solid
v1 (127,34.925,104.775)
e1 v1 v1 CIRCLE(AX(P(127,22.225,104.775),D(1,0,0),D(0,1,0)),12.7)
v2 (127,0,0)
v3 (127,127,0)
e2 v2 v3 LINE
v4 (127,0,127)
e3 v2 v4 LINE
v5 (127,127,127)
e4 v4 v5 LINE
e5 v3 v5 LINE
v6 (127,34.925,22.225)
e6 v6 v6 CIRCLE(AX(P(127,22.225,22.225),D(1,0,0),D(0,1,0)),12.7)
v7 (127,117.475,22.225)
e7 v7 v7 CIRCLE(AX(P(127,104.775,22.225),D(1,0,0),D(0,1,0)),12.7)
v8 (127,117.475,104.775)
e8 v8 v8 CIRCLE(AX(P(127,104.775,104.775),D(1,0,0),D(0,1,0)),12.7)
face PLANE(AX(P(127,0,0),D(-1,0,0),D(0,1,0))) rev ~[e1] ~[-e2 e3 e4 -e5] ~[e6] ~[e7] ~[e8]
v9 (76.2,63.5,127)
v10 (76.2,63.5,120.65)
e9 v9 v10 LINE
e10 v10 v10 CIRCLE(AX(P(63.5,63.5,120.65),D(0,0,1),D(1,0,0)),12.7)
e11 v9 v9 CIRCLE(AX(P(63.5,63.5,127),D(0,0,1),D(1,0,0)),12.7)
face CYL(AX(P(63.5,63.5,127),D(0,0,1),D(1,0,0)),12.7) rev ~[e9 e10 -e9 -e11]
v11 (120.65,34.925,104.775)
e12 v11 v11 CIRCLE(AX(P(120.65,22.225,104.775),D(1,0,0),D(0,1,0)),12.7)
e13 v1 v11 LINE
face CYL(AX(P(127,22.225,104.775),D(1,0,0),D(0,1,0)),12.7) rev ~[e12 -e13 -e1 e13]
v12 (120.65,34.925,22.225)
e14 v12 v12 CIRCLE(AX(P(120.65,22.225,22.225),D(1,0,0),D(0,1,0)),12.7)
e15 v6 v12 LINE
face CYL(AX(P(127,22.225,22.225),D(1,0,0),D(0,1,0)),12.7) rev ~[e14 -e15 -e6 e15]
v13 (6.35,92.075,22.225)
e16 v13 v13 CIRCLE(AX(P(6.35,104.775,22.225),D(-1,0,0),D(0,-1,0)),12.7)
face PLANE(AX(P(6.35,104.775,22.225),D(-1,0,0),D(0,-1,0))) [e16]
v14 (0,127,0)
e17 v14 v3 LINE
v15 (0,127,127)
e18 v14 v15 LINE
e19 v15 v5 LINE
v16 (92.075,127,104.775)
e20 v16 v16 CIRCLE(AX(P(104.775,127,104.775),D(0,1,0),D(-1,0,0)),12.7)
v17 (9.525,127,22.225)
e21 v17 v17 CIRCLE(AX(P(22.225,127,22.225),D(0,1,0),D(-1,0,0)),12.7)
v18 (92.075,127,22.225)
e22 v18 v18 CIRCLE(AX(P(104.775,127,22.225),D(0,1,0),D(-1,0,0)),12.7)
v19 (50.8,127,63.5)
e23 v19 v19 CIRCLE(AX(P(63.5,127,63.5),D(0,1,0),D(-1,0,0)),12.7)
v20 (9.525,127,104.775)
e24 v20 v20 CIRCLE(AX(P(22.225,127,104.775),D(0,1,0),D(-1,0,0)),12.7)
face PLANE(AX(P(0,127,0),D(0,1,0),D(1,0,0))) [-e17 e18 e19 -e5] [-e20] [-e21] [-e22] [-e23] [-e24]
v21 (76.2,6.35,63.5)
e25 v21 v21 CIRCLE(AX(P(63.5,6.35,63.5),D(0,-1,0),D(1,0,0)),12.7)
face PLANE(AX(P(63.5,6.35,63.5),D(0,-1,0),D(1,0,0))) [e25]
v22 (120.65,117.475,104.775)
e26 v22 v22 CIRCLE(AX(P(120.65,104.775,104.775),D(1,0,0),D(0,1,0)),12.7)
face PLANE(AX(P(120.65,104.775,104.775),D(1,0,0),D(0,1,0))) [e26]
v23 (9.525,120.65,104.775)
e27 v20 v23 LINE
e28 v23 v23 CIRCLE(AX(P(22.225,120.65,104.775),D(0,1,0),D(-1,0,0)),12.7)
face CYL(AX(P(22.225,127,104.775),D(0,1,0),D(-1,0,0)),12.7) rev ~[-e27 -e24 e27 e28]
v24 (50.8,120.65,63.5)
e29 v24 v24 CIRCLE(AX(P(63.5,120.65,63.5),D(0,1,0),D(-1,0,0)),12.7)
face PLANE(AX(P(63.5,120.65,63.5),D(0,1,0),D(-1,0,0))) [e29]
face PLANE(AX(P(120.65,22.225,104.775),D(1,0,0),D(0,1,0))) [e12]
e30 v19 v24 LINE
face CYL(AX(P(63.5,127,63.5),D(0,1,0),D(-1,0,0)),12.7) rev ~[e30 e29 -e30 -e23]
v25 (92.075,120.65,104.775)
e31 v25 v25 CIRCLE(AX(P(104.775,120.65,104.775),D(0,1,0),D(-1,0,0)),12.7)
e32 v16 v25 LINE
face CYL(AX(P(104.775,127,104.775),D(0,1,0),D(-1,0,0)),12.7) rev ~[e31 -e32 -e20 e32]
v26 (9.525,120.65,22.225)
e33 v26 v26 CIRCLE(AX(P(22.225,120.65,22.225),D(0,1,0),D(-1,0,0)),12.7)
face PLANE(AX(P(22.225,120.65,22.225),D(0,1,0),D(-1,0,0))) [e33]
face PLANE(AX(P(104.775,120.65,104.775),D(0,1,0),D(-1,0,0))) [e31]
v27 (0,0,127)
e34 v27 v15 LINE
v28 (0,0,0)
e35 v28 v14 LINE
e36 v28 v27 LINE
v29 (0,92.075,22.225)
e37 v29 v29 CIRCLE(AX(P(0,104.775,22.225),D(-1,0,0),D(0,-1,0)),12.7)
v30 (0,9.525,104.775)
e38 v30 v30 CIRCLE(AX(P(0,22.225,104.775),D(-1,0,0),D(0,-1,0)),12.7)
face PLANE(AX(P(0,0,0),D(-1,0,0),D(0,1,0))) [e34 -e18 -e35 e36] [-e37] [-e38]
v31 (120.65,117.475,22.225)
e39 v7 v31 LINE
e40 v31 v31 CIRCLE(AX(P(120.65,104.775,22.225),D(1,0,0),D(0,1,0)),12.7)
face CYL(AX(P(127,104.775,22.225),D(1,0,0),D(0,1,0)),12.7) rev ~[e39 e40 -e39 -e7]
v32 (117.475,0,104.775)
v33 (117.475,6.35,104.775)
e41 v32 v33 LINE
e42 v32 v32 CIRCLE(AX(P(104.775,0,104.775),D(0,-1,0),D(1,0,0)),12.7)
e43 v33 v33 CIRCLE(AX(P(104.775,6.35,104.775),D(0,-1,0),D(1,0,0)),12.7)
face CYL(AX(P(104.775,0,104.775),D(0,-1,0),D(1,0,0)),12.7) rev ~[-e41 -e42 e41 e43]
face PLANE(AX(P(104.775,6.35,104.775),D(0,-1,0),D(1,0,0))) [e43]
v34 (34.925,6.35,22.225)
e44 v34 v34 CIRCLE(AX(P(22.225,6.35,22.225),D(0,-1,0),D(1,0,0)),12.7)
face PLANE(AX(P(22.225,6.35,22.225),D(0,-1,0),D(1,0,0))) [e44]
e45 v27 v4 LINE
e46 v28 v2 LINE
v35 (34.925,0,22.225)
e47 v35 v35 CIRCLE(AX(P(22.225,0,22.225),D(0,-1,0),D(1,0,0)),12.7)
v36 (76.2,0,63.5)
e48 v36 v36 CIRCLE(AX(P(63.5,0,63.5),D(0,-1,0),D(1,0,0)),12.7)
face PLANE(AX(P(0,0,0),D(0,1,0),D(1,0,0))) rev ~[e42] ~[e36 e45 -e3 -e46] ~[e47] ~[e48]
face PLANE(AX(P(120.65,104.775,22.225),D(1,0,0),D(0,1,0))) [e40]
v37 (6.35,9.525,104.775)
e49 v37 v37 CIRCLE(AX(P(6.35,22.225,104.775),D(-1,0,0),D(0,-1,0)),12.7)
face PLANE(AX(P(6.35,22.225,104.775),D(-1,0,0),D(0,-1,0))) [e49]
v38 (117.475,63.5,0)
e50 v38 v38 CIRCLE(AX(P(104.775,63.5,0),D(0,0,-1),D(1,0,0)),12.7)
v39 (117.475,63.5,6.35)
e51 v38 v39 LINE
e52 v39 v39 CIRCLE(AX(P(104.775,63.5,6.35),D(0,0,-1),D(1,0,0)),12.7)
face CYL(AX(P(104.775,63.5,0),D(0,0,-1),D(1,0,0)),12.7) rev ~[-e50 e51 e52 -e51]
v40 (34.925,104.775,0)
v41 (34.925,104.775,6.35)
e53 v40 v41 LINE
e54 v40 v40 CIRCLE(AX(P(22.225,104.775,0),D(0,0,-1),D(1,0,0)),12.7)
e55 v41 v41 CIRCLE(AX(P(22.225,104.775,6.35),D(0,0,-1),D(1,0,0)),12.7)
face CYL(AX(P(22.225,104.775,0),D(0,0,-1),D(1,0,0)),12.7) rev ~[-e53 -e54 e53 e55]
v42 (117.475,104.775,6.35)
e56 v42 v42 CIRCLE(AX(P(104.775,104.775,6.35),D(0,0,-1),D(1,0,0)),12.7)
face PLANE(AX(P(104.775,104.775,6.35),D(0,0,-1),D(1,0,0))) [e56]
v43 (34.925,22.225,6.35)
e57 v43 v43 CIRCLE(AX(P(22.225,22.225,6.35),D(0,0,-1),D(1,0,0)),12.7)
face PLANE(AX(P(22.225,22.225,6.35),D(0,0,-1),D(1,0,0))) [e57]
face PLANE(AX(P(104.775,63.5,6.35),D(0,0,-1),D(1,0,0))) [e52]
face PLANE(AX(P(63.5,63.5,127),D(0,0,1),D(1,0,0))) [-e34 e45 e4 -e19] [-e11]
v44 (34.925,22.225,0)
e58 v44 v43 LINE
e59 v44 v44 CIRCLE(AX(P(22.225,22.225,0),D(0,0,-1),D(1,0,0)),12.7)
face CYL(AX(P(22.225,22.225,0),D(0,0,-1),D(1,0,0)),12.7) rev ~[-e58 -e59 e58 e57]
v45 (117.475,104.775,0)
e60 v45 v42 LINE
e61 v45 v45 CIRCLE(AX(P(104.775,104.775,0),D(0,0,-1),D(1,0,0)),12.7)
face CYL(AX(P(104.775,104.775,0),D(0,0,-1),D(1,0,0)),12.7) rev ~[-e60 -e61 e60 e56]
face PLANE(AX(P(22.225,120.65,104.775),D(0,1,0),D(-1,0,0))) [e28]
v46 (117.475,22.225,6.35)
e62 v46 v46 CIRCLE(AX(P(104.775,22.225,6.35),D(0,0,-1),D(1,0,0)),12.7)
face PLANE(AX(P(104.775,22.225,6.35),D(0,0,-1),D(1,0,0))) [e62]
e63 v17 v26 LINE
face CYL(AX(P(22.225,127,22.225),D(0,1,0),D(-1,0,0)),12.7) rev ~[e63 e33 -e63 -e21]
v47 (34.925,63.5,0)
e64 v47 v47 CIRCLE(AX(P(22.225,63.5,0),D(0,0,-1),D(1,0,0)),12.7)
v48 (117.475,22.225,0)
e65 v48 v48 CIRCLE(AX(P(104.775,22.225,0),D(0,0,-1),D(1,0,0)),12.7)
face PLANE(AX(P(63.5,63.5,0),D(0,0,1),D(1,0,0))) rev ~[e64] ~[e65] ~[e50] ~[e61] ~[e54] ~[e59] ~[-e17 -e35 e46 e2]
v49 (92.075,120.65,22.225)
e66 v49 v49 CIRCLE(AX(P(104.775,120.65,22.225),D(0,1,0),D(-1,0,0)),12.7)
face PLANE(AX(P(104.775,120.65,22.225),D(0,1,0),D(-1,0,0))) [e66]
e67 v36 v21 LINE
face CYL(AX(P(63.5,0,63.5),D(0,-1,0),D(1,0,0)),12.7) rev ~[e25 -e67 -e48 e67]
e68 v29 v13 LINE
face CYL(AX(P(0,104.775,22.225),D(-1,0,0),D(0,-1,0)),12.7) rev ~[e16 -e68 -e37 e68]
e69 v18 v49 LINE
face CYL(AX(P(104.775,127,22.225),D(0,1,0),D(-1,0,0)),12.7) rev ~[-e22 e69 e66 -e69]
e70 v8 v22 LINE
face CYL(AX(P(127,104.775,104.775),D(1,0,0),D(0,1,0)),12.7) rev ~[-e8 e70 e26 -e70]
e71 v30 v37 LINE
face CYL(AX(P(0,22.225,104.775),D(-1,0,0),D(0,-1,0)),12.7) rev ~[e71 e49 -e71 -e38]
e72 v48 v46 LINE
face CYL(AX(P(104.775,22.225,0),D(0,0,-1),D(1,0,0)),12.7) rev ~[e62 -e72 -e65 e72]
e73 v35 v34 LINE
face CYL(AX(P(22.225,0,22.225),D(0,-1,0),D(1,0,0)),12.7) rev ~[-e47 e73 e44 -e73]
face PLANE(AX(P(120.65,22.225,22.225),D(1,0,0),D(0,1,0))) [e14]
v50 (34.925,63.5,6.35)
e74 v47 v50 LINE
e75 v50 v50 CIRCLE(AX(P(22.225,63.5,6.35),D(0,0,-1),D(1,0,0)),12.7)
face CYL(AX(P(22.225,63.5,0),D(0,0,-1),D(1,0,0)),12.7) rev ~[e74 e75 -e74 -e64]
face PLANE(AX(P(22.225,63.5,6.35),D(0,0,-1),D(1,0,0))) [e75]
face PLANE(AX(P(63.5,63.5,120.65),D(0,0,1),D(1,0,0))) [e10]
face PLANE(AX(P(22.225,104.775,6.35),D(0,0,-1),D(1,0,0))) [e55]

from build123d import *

# Parameters (mm, degrees)
F0_W      = 127
F0_H      = 127
F1_DEPTH  = 127
F2_R      = 12.7
F3_DEPTH  = 6.35
F4_R      = 12.7
F5_DEPTH  = 6.35
F6_R      = 12.7
F7_DEPTH  = 6.35
F8_R      = 12.7
F9_DEPTH  = 6.35
F10_R     = 12.7
F11_DEPTH = 6.35
F12_R     = 12.7
F13_DEPTH = 6.35


# Not quite as in the source:
# - a feature names something its author has since deleted; it is built from what else it names


with BuildPart() as f1:
    # F0 (on Top) → F1 (new body)
    with BuildSketch(Plane.XY):
        with Locations((63.5, 63.5)):
            Rectangle(F0_W, F0_H)
    extrude(amount=F1_DEPTH)

    # F2 (on face) → F3 (cut)
    with BuildSketch(Plane.XY.offset(127)):
        with Locations((63.5, 63.5)):
            Circle(F2_R)
    extrude(amount=-F3_DEPTH, mode=Mode.SUBTRACT)

    # F4 (on face) → F5 (cut)
    with BuildSketch(Plane(origin=(0, 0, 0), x_dir=(0, -1, 0), z_dir=(-1, 0, 0))):
        with Locations((-104.775, 22.225)):
            Circle(F4_R)
        with Locations((-22.225, 104.775)):
            Circle(F4_R)
    extrude(amount=-F5_DEPTH, mode=Mode.SUBTRACT)

    # F6 (on face) → F7 (cut)
    with BuildSketch(Plane.XZ):
        with Locations((22.225, 22.225)):
            Circle(F6_R)
        with Locations((63.5, 63.5)):
            Circle(F6_R)
        with Locations((104.775, 104.775)):
            Circle(F6_R)
    extrude(amount=-F7_DEPTH, mode=Mode.SUBTRACT)

    # F8 (on face) → F9 (cut)
    with BuildSketch(Plane.YZ.offset(127)):
        with Locations((22.225, 22.225)):
            Circle(F8_R)
        with Locations((22.225, 104.775)):
            Circle(F8_R)
        with Locations((104.775, 104.775)):
            Circle(F8_R)
        with Locations((104.775, 22.225)):
            Circle(F8_R)
    extrude(amount=-F9_DEPTH, mode=Mode.SUBTRACT)

    # F10 (on face) → F11 (cut)
    with BuildSketch(Plane(origin=(0, 127, 0), x_dir=(-1, 0, 0), z_dir=(0, 1, 0))):
        with Locations((-22.225, 22.225)):
            Circle(F10_R)
        with Locations((-104.775, 22.225)):
            Circle(F10_R)
        with Locations((-104.775, 104.775)):
            Circle(F10_R)
        with Locations((-22.225, 104.775)):
            Circle(F10_R)
        with Locations((-63.5, 63.5)):
            Circle(F10_R)
    extrude(amount=-F11_DEPTH, mode=Mode.SUBTRACT)

    # F12 (on face) → F13 (cut)
    with BuildSketch(Plane(origin=(0, 0, 0), x_dir=(1, 0, 0), z_dir=(0, 0, -1))):
        with Locations((22.225, -104.775)):
            Circle(F12_R)
        with Locations((104.775, -22.225)):
            Circle(F12_R)
        with Locations((22.225, -63.5)):
            Circle(F12_R)
        with Locations((104.775, -63.5)):
            Circle(F12_R)
        with Locations((104.775, -104.775)):
            Circle(F12_R)
        with Locations((22.225, -22.225)):
            Circle(F12_R)
    extrude(amount=-F13_DEPTH, mode=Mode.SUBTRACT)


solid = f1.part
